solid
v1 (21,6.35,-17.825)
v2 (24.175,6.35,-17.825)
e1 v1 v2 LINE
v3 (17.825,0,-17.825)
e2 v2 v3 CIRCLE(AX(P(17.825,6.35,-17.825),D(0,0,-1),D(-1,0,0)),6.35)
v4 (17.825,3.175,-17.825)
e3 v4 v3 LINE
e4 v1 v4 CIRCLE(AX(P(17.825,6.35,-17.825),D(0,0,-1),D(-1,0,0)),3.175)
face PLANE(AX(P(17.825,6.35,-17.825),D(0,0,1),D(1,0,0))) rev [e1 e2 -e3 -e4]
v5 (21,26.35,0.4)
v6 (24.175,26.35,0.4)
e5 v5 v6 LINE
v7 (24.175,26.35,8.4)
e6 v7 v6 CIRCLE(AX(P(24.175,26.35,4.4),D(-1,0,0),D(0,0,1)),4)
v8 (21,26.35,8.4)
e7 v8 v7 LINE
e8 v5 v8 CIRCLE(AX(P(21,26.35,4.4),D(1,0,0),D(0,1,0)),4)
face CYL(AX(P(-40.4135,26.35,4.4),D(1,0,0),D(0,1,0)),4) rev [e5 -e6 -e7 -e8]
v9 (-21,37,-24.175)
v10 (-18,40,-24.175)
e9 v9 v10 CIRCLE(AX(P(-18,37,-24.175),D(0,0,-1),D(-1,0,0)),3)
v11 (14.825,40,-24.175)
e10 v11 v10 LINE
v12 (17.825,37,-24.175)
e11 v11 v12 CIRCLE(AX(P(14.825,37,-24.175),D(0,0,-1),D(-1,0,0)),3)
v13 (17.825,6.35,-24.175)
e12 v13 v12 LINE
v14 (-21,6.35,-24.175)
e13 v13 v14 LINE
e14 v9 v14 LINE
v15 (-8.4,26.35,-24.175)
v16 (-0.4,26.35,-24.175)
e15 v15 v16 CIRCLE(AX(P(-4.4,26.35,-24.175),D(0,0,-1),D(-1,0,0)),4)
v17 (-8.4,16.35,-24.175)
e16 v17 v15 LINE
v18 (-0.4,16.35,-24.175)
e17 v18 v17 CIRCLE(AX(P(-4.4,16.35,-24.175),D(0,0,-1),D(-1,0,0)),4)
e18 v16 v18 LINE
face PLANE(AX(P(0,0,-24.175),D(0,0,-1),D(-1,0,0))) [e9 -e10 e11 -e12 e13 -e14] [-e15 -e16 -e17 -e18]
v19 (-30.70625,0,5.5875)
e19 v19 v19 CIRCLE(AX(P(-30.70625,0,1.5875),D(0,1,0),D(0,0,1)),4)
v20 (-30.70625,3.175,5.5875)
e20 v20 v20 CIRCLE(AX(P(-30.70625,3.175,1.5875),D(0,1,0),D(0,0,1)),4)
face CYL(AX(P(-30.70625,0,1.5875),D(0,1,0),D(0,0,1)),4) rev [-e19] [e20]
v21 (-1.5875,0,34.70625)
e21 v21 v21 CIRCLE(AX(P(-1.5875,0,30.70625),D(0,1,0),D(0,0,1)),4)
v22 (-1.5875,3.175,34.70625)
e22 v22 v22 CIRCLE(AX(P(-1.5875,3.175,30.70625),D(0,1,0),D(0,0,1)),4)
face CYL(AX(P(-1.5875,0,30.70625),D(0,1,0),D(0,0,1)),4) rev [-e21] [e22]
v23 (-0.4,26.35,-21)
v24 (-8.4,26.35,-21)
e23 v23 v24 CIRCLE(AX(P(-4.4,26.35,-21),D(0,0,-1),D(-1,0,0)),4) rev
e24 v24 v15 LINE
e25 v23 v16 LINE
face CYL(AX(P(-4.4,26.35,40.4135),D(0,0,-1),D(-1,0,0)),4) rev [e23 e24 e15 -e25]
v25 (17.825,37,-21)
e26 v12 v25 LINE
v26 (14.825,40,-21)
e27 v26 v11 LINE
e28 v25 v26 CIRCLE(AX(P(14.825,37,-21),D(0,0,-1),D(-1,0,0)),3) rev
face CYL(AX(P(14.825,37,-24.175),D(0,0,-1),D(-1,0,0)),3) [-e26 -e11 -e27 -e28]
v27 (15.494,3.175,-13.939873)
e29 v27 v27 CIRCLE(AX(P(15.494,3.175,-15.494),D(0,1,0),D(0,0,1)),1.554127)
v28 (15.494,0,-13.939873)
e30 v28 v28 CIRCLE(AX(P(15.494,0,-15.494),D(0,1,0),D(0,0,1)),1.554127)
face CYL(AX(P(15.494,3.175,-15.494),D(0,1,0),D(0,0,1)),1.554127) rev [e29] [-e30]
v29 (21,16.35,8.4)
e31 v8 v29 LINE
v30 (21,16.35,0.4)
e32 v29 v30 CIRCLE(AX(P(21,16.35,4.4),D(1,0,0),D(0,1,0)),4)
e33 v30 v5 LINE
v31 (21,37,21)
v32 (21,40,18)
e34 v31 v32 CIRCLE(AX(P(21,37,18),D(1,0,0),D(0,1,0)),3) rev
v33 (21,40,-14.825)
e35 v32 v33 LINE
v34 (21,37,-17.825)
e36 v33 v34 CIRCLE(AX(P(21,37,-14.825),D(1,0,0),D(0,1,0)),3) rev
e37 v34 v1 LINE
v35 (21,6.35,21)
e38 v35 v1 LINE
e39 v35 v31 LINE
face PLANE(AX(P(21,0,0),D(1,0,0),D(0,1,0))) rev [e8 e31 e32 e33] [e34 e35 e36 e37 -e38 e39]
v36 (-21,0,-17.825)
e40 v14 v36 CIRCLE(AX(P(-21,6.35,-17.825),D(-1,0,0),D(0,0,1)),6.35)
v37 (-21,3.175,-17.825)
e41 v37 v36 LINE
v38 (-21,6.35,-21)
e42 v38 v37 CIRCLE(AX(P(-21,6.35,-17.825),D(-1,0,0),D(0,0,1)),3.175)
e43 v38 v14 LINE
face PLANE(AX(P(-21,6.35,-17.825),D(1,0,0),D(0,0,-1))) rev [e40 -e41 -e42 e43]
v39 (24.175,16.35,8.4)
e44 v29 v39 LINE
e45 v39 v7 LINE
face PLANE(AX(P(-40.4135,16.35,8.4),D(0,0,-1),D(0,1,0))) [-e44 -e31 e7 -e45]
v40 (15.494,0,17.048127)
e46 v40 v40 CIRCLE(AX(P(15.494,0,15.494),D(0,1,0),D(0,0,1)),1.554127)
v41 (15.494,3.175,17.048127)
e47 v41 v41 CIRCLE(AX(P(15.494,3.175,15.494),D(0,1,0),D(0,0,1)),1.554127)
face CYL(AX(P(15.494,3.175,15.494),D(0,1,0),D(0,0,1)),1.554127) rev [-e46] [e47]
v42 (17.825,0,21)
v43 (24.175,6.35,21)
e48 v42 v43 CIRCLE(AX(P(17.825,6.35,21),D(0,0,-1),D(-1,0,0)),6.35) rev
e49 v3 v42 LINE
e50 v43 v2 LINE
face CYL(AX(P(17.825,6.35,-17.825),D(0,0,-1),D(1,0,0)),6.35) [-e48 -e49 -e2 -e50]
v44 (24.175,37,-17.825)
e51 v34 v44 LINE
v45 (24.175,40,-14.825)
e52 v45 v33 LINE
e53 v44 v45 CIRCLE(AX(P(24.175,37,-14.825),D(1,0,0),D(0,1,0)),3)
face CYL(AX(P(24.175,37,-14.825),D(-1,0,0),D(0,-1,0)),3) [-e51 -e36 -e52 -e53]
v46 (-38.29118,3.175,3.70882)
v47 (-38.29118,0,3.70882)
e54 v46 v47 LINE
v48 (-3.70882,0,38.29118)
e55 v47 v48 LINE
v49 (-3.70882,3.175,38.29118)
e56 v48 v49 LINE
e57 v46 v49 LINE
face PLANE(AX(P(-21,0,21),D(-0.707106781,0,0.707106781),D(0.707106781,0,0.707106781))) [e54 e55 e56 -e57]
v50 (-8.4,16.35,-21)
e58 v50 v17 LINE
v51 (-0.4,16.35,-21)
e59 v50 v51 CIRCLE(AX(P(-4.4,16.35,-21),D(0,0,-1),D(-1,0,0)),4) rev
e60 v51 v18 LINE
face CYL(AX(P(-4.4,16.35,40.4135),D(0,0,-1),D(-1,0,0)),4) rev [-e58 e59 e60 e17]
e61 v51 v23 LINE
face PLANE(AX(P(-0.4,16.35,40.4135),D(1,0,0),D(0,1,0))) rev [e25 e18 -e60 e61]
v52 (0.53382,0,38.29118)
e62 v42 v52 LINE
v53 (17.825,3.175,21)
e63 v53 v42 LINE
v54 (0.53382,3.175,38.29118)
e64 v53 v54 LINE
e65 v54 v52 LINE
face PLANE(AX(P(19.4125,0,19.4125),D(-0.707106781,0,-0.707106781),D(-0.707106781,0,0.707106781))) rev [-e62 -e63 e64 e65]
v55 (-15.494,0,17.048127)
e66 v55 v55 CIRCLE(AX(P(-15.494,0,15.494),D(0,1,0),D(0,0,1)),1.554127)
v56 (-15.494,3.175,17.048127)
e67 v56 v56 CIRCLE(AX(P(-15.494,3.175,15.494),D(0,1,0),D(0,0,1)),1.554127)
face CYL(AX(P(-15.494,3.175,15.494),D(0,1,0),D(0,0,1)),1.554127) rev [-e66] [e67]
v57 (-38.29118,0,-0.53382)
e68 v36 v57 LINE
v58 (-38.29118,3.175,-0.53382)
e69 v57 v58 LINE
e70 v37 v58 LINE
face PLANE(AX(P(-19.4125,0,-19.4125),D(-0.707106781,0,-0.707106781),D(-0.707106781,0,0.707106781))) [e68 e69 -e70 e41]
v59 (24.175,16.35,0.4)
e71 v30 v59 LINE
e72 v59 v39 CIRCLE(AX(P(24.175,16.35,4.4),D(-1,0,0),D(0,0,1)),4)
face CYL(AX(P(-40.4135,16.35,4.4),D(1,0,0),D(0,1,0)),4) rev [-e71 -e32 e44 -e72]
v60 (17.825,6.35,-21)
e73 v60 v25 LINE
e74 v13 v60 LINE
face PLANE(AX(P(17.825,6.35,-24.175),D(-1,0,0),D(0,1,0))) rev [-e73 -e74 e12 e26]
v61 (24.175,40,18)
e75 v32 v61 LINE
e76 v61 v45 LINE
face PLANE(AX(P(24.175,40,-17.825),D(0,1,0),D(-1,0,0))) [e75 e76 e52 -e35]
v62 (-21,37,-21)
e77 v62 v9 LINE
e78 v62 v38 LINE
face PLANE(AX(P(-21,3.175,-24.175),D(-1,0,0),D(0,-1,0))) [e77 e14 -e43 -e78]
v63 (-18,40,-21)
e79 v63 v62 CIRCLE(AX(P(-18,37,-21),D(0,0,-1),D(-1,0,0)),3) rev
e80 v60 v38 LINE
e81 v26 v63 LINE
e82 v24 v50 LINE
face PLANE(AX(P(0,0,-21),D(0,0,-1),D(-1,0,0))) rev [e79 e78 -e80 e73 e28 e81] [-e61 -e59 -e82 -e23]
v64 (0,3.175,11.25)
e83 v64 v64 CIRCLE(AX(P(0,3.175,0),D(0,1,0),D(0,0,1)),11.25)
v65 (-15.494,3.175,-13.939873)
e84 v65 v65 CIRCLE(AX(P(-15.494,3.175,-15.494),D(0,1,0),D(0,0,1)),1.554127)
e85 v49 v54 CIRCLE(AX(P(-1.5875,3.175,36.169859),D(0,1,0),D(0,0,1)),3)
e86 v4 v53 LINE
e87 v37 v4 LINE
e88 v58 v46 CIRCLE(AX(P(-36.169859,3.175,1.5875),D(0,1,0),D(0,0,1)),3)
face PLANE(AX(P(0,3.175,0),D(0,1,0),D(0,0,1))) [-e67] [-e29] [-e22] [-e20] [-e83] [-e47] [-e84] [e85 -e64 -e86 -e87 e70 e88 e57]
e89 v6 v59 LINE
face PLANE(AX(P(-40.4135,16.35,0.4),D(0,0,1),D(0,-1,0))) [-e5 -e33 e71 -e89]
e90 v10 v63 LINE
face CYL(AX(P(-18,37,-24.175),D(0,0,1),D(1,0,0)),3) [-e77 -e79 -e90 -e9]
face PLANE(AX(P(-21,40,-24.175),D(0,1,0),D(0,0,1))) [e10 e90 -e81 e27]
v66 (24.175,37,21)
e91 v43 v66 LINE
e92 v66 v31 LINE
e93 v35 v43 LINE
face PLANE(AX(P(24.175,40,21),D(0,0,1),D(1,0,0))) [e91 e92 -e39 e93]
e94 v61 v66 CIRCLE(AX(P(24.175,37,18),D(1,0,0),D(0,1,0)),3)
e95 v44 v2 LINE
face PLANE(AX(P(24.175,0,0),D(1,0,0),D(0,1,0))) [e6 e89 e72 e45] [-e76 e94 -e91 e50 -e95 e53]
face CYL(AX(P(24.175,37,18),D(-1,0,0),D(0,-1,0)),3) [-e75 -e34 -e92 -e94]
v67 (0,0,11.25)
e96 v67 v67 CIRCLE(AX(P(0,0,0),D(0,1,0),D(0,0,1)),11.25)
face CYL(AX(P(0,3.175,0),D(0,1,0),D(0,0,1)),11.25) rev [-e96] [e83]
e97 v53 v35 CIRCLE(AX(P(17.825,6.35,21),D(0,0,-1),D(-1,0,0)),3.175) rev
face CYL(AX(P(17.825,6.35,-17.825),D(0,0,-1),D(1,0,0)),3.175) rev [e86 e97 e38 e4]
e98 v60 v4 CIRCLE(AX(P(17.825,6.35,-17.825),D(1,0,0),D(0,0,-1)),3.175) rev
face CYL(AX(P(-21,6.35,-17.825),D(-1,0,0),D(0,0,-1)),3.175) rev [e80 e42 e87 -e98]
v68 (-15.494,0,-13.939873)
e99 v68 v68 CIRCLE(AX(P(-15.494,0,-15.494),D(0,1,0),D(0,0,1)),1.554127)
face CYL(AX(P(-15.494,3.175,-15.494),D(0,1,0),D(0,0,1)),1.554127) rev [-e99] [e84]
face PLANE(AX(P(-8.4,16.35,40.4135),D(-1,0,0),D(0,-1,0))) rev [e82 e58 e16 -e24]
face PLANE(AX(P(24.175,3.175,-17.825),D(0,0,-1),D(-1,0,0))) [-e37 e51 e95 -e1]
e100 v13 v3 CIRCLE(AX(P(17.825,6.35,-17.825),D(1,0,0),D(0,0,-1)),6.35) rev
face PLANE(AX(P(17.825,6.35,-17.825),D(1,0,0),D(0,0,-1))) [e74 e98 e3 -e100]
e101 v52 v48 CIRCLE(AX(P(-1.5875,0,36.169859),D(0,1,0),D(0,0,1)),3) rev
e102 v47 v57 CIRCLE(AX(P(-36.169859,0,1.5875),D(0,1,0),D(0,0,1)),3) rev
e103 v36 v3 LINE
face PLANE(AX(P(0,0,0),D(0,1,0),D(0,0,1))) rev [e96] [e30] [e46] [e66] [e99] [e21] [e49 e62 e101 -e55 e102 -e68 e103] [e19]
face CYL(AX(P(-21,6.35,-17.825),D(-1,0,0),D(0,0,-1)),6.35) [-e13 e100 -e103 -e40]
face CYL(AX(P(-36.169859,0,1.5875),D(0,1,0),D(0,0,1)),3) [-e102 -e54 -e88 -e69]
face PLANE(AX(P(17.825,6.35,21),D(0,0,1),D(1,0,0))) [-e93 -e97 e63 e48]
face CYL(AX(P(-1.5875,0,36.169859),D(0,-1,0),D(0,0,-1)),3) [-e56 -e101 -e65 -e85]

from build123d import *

# Parameters (mm, degrees)
SKETCH2_W                    = 42
SKETCH2_H                    = 42
BOSS_EXTRUDE1_DEPTH          = 3.175
SKETCH3_R                    = 11.25
SKETCH3_R_2                  = 1.554126588
CUT_EXTRUDE1_DEPTH           = 3.175
EDGE_FLANGE3_STRIP_W         = 19.05
EDGE_FLANGE3_STRIP_H         = 3.175
EDGE_FLANGE3_STRIP_CUT_DEPTH = 42
EDGE_FLANGE3_DEPTH           = 42
EDGE_FLANGE4_START           = -24.175
EDGE_FLANGE4_OUTLINE_W       = 3.175
EDGE_FLANGE4_OUTLINE_H       = 6.35
EDGE_FLANGE4_DEPTH           = 6.35
EDGE_FLANGE4_START_2         = -17.825
EDGE_FLANGE4_2_DEPTH         = 38.825
EDGE_FLANGE4_3_DEPTH         = 38.825
SKETCH22_W                   = 3.175
SKETCH22_H                   = 33.65
CUT_EXTRUDE2_DEPTH           = 3.175
SKETCH23_R                   = 4
BOSS_EXTRUDE2_DEPTH          = 3.175
CUT_EXTRUDE3_REACH           = 88.051
FILLET1_R                    = 3


# Read off the part's stored shape, not the designer's step: Edge-Flange4
# Sheet-metal steps are written as plain solids
with BuildPart() as part:
    # Sketch2 → Boss-Extrude1 (new body)
    with BuildSketch(Plane(origin=(0, 0, 0), x_dir=(1, 0, 0), z_dir=(0, 1, 0))):
        Rectangle(SKETCH2_W, SKETCH2_H)
    extrude(amount=BOSS_EXTRUDE1_DEPTH)

    # Sketch3 → Cut-Extrude1 (cut)
    with BuildSketch(Plane(origin=(0, 3.175, 0), x_dir=(1, 0, 0), z_dir=(0, 1, 0))):
        with Locations(Location((0, 0, 0), (0, 0, 270))):
            Circle(SKETCH3_R)
        with Locations(Location((-15.494, 15.494, 0), (0, 0, 270))):
            Circle(SKETCH3_R_2)
        with Locations(Location((15.494, 15.494, 0), (0, 0, 270))):
            Circle(SKETCH3_R_2)
        with Locations(Location((15.494, -15.494, 0), (0, 0, 270))):
            Circle(SKETCH3_R_2)
        with Locations(Location((-15.494, -15.494, 0), (0, 0, 270))):
            Circle(SKETCH3_R_2)
    extrude(amount=-CUT_EXTRUDE1_DEPTH, mode=Mode.SUBTRACT)

    # Edge-Flange3 strip (across the edge) → Edge-Flange3 strip cut (cut)
    with BuildSketch(Plane(origin=(21, 3.175, -21), x_dir=(0, 0, 1), z_dir=(-1, 0, 0))):
        with Locations((-6.35, -1.5875)):
            Rectangle(EDGE_FLANGE3_STRIP_W, EDGE_FLANGE3_STRIP_H)
    extrude(amount=EDGE_FLANGE3_STRIP_CUT_DEPTH, mode=Mode.SUBTRACT)

    # Edge-Flange3 section (across the edge) → Edge-Flange3 (add)
    with BuildSketch(Plane(origin=(21, 3.175, -21), x_dir=(0, 0, 1), z_dir=(-1, 0, 0))):
        with BuildLine():
            Line((-3.175, 3.175), (-3.175, 36.825))
            Line((-3.175, 36.825), (0, 36.825))
            Line((0, 36.825), (0, 3.175))
            ThreePointArc((0, 3.175), (0.92993597, 0.92993597), (3.175, 0))
            Line((3.175, 0), (3.175, -3.175))
            ThreePointArc((3.175, -3.175), (-1.315128061, -1.315128061), (-3.175, 3.175))
        make_face()
    extrude(amount=EDGE_FLANGE3_DEPTH)

    # Edge-Flange4 outline → Edge-Flange4 (cut)
    with BuildSketch(Plane.XY.offset(EDGE_FLANGE4_START)):
        with Locations((19.4125, 3.175)):
            Rectangle(EDGE_FLANGE4_OUTLINE_W, EDGE_FLANGE4_OUTLINE_H)
    extrude(amount=EDGE_FLANGE4_DEPTH, mode=Mode.SUBTRACT)

    # Edge-Flange4 2 outline → Edge-Flange4 2 (cut)
    with BuildSketch(Plane.XY.offset(EDGE_FLANGE4_START_2)):
        with BuildLine():
            ThreePointArc((21, 0.850738685), (19.468500936, 0.216371003), (17.825, 0))
            Line((17.825, 0), (21, 0))
            Line((21, 0), (21, 0.850738685))
        make_face()
    extrude(amount=EDGE_FLANGE4_2_DEPTH, mode=Mode.SUBTRACT)

    # Edge-Flange4 3 outline → Edge-Flange4 3 (add)
    with BuildSketch(Plane.XY.offset(EDGE_FLANGE4_START_2)):
        with BuildLine():
            Line((17.825, 3.175), (21, 3.175))
            Line((21, 3.175), (21, 0.850738685))
            ThreePointArc((21, 0.850738685), (23.324261314, 3.174999999), (24.175, 6.35))
            Line((24.175, 6.35), (24.175, 40))
            Line((24.175, 40), (21, 40))
            Line((21, 40), (21, 6.35))
            ThreePointArc((21, 6.35), (20.07006403, 4.10493597), (17.825, 3.175))
        make_face()
    extrude(amount=EDGE_FLANGE4_3_DEPTH)

    # Sketch22 → Cut-Extrude2 (cut)
    with BuildSketch(Plane(origin=(0, 0, -24.175), x_dir=(-1, 0, 0), z_dir=(0, 0, -1))):
        with Locations((-19.4125, 23.175)):
            Rectangle(SKETCH22_W, SKETCH22_H)
    extrude(amount=-CUT_EXTRUDE2_DEPTH, mode=Mode.SUBTRACT)

    # Sketch23 → Boss-Extrude2 (add)
    # profile 1 of 2: a face of its own
    with BuildSketch(Plane(origin=(0, 3.175, 0), x_dir=(1, 0, 0), z_dir=(0, 1, 0))):
        Polygon((-21, -21), (-21, 17.825), (-40.4125, -1.5875), align=None)
        with Locations(Location((-30.70625, -1.5875, 0), (0, 0, 270))):
            Circle(SKETCH23_R, mode=Mode.SUBTRACT)
    # profile 2 of 2: a face of its own
    with BuildSketch(Plane(origin=(0, 3.175, 0), x_dir=(1, 0, 0), z_dir=(0, 1, 0))):
        Polygon((17.825, -21), (-21, -21), (-1.5875, -40.4125), align=None)
        with Locations(Location((-1.5875, -30.70625, 0), (0, 0, 270))):
            Circle(SKETCH23_R, mode=Mode.SUBTRACT)
    extrude(amount=-BOSS_EXTRUDE2_DEPTH)

    # Sketch24 → Cut-Extrude3 (cut, up to next)
    with BuildSketch(Plane(origin=(0, 0, -24.175), x_dir=(-1, 0, 0), z_dir=(0, 0, -1)), mode=Mode.PRIVATE) as cut_extrude3_sk1:
        with BuildLine():
            Line((0.4, 16.35), (0.4, 26.35))
            ThreePointArc((0.4, 26.35), (4.4, 30.35), (8.4, 26.35))
            Line((8.4, 26.35), (8.4, 16.35))
            ThreePointArc((8.4, 16.35), (4.4, 12.35), (0.4, 16.35))
        make_face()
    cut_extrude3_tool1 = extrude(cut_extrude3_sk1.sketch, amount=-CUT_EXTRUDE3_REACH, mode=Mode.PRIVATE) & part.part
    cut_extrude3 = cut_extrude3_tool1.solids().sort_by_distance((-4.4, 21.35, -24.175))[0]
    add(cut_extrude3, mode=Mode.SUBTRACT)

    # Mirror1: Cut-Extrude3 across plane
    add(cut_extrude3.mirror(Plane(origin=(0, 0, 0), x_dir=(-0.7071067811865478, 2.4649279095086426e-15, 0.7071067811865472), z_dir=(-0.7071067811865475, 2.4649279095086418e-15, -0.7071067811865477))), mode=Mode.SUBTRACT)

    # Fillet1
    fillet1_edges = [part.edges().sort_by_distance(p)[0] for p in [
        (-40.4125, 1.5875, 1.5875),
        (-1.5875, 1.5875, 40.4125),
        (-21, 40, -22.5875),
        (22.5875, 40, 21),
        (22.5875, 40, -17.825),
        (17.825, 40, -22.5875),
    ]]
    fillet(fillet1_edges, radius=FILLET1_R)


solid = part.part
